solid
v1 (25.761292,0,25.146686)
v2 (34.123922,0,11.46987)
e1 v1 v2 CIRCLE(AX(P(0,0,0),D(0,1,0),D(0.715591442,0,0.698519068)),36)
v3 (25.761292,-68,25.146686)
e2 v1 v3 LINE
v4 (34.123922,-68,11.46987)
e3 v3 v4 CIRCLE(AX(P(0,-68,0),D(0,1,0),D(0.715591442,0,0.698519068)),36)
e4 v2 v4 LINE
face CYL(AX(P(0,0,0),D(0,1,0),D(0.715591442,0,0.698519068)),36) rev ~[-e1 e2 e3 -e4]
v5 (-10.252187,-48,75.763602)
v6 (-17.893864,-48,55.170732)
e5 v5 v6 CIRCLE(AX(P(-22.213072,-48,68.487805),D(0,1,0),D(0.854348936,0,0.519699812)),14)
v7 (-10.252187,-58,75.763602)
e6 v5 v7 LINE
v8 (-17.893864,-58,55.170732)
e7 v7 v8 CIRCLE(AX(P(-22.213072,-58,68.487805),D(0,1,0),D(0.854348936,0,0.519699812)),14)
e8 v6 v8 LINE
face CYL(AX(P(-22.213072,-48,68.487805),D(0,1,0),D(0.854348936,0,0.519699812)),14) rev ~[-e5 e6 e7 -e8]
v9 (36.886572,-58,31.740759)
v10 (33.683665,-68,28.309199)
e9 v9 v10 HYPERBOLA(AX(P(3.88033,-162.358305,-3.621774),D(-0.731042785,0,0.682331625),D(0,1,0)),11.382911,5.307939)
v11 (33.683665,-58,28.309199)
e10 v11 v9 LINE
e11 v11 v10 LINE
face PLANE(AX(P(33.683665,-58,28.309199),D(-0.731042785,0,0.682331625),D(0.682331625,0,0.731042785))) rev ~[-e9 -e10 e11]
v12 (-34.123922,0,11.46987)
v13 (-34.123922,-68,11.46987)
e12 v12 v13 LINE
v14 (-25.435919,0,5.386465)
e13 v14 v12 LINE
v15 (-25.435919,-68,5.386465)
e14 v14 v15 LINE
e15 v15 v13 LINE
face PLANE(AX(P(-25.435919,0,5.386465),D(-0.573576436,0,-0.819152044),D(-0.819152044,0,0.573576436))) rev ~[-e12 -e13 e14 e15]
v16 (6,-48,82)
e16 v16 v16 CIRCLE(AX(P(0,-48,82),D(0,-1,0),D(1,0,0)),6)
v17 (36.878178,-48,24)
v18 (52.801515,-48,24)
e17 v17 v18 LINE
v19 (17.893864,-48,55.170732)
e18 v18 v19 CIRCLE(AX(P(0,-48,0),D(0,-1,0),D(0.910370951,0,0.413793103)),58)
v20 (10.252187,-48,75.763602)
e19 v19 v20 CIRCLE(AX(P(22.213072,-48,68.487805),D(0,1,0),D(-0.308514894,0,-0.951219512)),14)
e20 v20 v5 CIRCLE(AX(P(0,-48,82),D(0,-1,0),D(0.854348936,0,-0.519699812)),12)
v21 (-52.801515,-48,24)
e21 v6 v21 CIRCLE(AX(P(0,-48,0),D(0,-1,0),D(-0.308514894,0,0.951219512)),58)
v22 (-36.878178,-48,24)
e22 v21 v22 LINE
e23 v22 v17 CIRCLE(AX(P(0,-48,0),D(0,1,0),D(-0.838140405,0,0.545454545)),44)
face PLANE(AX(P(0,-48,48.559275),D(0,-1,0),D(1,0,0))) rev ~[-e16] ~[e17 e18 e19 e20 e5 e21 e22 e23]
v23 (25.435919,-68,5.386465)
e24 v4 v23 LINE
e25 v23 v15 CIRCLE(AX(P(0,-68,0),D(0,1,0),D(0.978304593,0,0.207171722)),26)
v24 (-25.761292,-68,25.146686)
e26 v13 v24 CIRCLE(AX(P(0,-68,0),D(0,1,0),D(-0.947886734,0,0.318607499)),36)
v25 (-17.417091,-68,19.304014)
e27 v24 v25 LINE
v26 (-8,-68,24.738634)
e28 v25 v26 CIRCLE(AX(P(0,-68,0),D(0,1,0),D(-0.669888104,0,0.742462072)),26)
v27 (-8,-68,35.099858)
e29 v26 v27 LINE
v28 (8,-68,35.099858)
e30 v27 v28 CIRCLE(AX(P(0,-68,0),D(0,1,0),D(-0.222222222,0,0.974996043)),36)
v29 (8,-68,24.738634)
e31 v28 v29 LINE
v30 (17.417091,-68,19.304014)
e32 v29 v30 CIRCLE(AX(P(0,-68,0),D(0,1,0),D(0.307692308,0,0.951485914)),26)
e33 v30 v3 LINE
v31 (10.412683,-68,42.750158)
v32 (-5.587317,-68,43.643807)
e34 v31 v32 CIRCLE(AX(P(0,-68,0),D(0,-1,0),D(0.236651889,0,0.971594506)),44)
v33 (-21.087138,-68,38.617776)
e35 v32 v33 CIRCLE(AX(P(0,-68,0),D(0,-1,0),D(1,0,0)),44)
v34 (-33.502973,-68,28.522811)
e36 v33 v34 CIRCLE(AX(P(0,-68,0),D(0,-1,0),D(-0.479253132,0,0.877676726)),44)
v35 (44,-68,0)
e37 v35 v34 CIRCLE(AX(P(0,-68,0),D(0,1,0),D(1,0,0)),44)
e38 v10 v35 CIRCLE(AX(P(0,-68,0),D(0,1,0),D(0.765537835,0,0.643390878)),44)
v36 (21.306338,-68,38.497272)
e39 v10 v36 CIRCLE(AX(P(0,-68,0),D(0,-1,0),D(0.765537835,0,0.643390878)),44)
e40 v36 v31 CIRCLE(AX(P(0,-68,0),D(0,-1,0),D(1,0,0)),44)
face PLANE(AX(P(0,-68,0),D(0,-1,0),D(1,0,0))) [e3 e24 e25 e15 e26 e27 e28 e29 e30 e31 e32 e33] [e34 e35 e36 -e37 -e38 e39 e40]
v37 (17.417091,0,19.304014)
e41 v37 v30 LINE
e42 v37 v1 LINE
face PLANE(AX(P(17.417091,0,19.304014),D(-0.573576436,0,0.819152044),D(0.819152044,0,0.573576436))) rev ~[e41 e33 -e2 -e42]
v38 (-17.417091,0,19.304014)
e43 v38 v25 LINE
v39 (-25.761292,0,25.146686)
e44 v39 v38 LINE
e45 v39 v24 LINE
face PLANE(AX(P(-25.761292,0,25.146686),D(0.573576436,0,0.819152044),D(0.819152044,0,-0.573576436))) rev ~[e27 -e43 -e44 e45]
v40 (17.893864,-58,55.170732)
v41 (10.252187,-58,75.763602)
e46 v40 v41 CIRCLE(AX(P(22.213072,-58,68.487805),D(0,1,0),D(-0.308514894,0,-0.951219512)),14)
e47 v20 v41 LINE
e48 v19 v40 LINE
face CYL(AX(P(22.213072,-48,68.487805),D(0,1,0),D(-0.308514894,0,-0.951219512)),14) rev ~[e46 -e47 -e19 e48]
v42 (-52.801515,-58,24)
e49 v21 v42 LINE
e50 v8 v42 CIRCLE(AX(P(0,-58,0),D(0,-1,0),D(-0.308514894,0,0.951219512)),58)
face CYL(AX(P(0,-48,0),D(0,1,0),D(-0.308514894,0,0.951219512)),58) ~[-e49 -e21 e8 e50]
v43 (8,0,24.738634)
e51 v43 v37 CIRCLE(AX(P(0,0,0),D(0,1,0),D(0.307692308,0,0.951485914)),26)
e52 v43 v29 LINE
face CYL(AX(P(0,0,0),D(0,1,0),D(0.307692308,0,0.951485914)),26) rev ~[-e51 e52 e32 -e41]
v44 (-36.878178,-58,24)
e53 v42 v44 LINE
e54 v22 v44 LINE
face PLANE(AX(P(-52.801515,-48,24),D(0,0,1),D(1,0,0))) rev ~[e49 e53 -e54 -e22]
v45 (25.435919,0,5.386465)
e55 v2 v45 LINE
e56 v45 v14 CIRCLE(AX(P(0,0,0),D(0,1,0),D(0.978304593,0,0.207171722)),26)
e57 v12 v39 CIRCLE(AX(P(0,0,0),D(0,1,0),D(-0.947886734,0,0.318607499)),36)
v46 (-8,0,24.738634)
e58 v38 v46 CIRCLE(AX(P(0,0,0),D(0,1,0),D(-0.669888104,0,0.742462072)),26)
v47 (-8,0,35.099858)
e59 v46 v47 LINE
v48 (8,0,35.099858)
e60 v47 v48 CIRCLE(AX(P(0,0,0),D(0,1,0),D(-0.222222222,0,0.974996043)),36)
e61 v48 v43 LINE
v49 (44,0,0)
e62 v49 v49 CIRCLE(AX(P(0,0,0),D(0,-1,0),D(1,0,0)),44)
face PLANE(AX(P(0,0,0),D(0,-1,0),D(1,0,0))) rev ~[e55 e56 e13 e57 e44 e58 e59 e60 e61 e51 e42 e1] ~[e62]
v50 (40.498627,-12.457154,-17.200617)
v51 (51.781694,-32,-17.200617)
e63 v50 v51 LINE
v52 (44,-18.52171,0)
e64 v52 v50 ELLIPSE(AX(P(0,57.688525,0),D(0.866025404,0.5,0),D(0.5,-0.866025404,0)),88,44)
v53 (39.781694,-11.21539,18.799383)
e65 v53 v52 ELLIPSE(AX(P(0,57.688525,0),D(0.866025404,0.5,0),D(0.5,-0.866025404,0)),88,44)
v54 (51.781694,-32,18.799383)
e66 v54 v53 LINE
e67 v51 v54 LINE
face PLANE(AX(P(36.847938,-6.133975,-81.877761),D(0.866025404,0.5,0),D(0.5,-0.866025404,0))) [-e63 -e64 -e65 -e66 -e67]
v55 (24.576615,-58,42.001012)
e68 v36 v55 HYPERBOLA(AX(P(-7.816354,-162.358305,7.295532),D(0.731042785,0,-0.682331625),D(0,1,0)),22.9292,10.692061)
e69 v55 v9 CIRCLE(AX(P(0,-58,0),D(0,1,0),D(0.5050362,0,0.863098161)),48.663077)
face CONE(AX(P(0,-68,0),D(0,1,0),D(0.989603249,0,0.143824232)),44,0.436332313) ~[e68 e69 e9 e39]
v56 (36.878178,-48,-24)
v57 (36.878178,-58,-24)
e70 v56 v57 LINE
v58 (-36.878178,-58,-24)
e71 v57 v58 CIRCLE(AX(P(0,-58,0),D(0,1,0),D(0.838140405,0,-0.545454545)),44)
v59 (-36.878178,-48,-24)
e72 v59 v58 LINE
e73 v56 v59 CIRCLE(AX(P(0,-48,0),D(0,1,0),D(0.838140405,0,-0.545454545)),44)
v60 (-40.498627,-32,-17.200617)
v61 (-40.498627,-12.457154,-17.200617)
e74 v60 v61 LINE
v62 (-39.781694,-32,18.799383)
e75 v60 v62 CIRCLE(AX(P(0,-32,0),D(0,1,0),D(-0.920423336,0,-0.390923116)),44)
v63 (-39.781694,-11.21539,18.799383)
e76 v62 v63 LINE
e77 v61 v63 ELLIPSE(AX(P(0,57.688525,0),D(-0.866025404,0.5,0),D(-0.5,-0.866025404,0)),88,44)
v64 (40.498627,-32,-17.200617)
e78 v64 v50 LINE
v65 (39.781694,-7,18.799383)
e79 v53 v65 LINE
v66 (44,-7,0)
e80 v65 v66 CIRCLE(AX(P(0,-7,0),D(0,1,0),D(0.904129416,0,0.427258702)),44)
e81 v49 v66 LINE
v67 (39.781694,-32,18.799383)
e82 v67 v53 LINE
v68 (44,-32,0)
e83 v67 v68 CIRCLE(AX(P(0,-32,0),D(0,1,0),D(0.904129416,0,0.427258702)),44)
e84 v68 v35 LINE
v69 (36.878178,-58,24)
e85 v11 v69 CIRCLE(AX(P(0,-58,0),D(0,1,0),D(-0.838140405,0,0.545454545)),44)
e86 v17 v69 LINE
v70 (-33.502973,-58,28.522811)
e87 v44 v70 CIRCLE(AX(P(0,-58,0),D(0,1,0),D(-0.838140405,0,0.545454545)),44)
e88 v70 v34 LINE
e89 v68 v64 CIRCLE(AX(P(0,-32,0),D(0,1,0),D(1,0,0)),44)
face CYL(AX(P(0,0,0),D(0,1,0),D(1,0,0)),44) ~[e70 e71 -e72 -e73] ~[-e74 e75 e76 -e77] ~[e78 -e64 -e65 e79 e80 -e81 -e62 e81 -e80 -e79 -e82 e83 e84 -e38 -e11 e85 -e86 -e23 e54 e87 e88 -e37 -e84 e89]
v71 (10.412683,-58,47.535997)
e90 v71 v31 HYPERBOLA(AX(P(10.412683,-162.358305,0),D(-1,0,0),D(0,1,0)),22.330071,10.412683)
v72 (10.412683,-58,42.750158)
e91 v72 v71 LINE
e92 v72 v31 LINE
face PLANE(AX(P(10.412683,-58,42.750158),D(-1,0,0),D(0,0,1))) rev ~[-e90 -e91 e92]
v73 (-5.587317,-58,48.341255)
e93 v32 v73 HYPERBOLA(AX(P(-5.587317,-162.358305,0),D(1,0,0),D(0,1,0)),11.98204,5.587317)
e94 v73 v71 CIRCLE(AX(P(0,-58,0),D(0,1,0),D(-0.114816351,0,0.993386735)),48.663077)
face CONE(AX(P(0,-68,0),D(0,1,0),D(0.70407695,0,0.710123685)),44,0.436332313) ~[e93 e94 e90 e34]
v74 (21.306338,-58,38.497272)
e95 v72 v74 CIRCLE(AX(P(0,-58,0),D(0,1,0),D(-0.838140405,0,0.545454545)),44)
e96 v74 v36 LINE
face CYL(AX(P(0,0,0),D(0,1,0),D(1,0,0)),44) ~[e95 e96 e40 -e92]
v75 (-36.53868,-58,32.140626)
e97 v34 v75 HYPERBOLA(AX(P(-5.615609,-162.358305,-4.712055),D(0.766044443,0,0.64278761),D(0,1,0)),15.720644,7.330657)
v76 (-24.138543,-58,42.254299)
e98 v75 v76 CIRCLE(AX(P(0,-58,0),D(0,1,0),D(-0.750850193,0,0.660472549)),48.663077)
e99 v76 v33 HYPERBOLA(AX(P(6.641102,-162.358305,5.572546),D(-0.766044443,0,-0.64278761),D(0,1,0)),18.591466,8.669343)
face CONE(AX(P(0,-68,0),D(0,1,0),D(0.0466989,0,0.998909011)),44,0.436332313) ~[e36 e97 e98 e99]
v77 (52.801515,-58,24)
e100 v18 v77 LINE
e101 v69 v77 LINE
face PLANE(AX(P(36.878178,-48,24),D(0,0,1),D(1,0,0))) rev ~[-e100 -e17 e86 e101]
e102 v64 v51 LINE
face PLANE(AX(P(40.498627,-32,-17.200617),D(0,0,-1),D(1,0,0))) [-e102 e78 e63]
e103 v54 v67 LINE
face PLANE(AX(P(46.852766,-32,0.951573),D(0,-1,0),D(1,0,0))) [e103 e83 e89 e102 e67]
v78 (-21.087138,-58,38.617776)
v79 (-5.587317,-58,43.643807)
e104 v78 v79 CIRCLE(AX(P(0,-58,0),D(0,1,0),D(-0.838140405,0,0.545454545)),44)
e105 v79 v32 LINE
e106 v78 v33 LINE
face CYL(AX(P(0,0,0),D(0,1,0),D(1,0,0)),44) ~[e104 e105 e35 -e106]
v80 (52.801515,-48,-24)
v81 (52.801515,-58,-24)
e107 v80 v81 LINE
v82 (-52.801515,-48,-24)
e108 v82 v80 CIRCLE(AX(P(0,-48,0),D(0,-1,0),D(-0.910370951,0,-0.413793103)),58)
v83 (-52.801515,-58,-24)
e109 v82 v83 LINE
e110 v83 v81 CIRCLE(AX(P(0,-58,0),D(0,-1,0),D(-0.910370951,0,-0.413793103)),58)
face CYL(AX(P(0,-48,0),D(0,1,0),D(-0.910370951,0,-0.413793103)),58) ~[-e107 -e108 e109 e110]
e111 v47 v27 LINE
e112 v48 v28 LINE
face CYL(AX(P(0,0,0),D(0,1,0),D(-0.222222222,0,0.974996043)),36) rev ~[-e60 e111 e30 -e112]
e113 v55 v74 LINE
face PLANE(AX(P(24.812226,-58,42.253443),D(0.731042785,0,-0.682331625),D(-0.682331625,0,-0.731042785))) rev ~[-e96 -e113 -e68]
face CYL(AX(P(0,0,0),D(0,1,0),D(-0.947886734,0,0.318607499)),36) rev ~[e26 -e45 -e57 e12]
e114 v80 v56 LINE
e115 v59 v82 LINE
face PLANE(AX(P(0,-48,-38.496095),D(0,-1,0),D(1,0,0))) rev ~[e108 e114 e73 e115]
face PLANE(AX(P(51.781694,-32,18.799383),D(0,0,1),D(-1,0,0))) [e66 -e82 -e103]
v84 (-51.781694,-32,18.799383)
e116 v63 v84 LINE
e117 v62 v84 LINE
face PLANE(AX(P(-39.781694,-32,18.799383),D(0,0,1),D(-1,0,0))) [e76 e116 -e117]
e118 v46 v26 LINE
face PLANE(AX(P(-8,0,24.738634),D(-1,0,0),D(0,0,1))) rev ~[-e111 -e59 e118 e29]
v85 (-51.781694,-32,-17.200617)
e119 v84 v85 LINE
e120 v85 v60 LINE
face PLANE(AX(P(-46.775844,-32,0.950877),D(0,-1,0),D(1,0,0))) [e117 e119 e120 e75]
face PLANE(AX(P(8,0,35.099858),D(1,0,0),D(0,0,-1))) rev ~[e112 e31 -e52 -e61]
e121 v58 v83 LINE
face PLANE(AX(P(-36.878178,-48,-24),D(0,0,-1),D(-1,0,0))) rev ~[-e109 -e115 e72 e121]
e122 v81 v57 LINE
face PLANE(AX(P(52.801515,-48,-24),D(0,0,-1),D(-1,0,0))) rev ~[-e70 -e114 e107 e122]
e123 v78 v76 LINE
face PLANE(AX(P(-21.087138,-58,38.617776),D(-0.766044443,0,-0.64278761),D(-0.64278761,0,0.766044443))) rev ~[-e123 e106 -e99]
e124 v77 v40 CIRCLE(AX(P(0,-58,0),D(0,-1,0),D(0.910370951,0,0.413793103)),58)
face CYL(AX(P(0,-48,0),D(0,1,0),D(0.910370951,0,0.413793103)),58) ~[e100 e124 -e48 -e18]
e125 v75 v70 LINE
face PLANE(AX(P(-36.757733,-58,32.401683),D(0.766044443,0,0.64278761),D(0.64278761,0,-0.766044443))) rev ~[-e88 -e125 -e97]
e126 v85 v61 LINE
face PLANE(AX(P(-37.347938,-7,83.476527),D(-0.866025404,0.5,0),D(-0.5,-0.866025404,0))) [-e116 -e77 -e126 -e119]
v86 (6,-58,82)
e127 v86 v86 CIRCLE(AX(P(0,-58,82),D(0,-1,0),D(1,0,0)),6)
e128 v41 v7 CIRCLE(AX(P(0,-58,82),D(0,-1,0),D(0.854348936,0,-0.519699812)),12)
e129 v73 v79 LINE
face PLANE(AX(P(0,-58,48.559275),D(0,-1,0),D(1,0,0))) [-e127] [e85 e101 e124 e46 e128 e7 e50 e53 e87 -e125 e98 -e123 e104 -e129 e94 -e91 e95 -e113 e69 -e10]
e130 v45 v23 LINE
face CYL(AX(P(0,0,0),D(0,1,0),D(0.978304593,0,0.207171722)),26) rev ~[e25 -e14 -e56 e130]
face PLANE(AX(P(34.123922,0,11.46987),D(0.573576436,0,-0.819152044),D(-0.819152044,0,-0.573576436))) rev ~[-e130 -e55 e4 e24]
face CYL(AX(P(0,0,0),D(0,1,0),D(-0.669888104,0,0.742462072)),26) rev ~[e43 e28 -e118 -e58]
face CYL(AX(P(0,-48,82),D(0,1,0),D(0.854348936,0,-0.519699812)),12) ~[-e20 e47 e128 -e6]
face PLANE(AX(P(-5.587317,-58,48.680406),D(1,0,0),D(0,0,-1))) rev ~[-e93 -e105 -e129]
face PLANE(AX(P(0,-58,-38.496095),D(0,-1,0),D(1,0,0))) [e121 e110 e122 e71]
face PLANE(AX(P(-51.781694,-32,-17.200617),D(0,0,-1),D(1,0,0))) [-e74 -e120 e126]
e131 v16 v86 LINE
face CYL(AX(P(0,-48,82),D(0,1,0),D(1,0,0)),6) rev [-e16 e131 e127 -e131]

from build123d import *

# Parameters (mm, degrees)
F0_R         = 44
F1_DEPTH     = 68
F3_R         = 6
F4_DEPTH     = 10
F7_DEPTH     = 10
F8_T4_ANGLE  = 83.7942350081
F8_T9_ANGLE  = 83.7884226617
F8_T14_ANGLE = 83.7665747307
F11_DEPTH    = 25
F12_T4_DEPTH = 165.3542877323
F12_S5_R     = 44
F12_T6_DEPTH = 86
F13_T4_DEPTH = 165.3542877323
F13_S5_R     = 44
F13_T6_DEPTH = 85


# Not quite as in the source:
# - a fillet or chamfer that OpenCascade refuses, or shapes differently, is made with other operations: its cross-section is extruded or revolved along the edge and cut away or added


with BuildPart() as f1:
    # F0 (on Front) → F1 (new body)
    with BuildSketch(Plane.XZ):
        Circle(F0_R)
        with BuildLine():
            ThreePointArc((-17.4170906965, 19.3040138746), (-12.9958030986, 22.5190830591), (-8, 24.7386337537))
            Line((-8, 24.7386337537), (-8, 35.0998575496))
            ThreePointArc((-8, 35.0998575496), (0, 36), (8, 35.0998575496))
            Line((8, 35.0998575496), (8, 24.7386337537))
            ThreePointArc((8, 24.7386337537), (12.9958030986, 22.5190830591), (17.4170906965, 19.3040138746))
            Line((17.4170906965, 19.3040138746), (25.7612918983, 25.1466864563))
            ThreePointArc((25.7612918983, 25.1466864563), (30.7135727536, 18.7796818053), (34.1239224392, 11.4698699802))
            Line((34.1239224392, 11.4698699802), (25.4359194285, 5.3864647801))
            ThreePointArc((25.4359194285, 5.3864647801), (0, -26), (-25.4359194285, 5.3864647801))
            Line((-25.4359194285, 5.3864647801), (-34.1239224392, 11.4698699802))
            ThreePointArc((-34.1239224392, 11.4698699802), (-30.7135727536, 18.7796818053), (-25.7612918983, 25.1466864563))
            Line((-25.7612918983, 25.1466864563), (-17.4170906965, 19.3040138746))
        make_face(mode=Mode.SUBTRACT)
    extrude(amount=F1_DEPTH)

    # F3 (on offset) → F4 (join)
    with BuildSketch(Plane.XZ.offset(48)):
        with BuildLine():
            ThreePointArc((-10.252187236, 75.7636022514), (-9.0876412514, 63.6171726174), (-17.8938638331, 55.1707317073))
            ThreePointArc((-17.8938638331, 55.1707317073), (-38.6311115614, 43.2624227191), (-52.8015151298, 24))
            Line((-52.8015151298, 24), (-36.8781778292, 24))
            ThreePointArc((-36.8781778292, 24), (0, 44), (36.8781778292, 24))
            Line((36.8781778292, 24), (52.8015151298, 24))
            ThreePointArc((52.8015151298, 24), (38.6311115614, 43.2624227191), (17.8938638331, 55.1707317073))
            ThreePointArc((17.8938638331, 55.1707317073), (9.0876412514, 63.6171726174), (10.252187236, 75.7636022514))
            ThreePointArc((10.252187236, 75.7636022514), (0, 94), (-10.252187236, 75.7636022514))
        make_face()
        with Locations((0, 82)):
            Circle(F3_R, mode=Mode.SUBTRACT)
        with BuildLine():
            ThreePointArc((36.8781778292, -24), (0, -44), (-36.8781778292, -24))
            Line((-36.8781778292, -24), (-52.8015151298, -24))
            ThreePointArc((-52.8015151298, -24), (0, -58), (52.8015151298, -24))
            Line((52.8015151298, -24), (36.8781778292, -24))
        make_face()
    extrude(amount=F4_DEPTH)

    # F6 (on offset) → F7 (join)
    with BuildSketch(Plane.XZ.offset(58)):
        with BuildLine():
            Line((-36.7577330787, 32.4016829643), (-33.5029734135, 28.5228114402))
            ThreePointArc((-33.5029734135, 28.5228114402), (-27.7578301996, 34.1394619555), (-21.0871377876, 38.6177759578))
            Line((-21.0871377876, 38.6177759578), (-24.3586089556, 42.5165634753))
            ThreePointArc((-24.3586089556, 42.5165634753), (-30.9738521636, 37.9686776455), (-36.7577330787, 32.4016829643))
        make_face()
        with BuildLine():
            ThreePointArc((-5.5873169023, 43.6438070043), (2.4537097938, 43.9315297736), (10.4126830977, 42.7501582536))
            Line((10.4126830977, 42.7501582536), (10.4126830977, 47.8808524434))
            ThreePointArc((10.4126830977, 47.8808524434), (2.4455798994, 48.9389327525), (-5.5873169023, 48.6804056046))
            Line((-5.5873169023, 48.6804056046), (-5.5873169023, 43.6438070043))
        make_face()
        with BuildLine():
            Line((33.6836647587, 28.3091986539), (37.1178360984, 31.9885329982))
            ThreePointArc((37.1178360984, 31.9885329982), (31.3875014297, 37.6274468175), (24.8122261451, 42.2534428624))
            Line((24.8122261451, 42.2534428624), (21.306338137, 38.4972720487))
            ThreePointArc((21.306338137, 38.4972720487), (27.9629096213, 33.9716894709), (33.6836647587, 28.3091986539))
        make_face()
    extrude(amount=F7_DEPTH)

    # F8: chamfer of 5 x 10.7225346025 on 3 edges, made by hand


with BuildPart() as f8_tool2:
    # F8_s3 → F8_t4 (revolve)
    with BuildSketch(Plane(origin=(0, 0, 0), x_dir=(0, 1, 0), z_dir=(0.1438242317, 0, -0.989603249))):
        Polygon((-68, 44), (-57.2774653975, 49), (-68, 49), align=None)
    revolve(axis=Axis((0, -68, 0), (0, -1, 0)), revolution_arc=F8_T4_ANGLE)

    split(bisect_by=Plane.XZ.offset(58), keep=Keep.TOP)


with BuildPart() as f1_1:
    add(f1.part)

    # F8_t1: cut F8_tool2
    add(f8_tool2.part, mode=Mode.SUBTRACT)


with BuildPart() as f8_tool7:
    # F8_s8 → F8_t9 (revolve)
    with BuildSketch(Plane(origin=(0, 0, 0), x_dir=(0, 1, 0), z_dir=(0.7101236851, 0, -0.7040769502))):
        Polygon((-68, 44), (-57.2774653975, 49), (-68, 49), align=None)
    revolve(axis=Axis((0, -68, 0), (0, -1, 0)), revolution_arc=F8_T9_ANGLE)

    split(bisect_by=Plane.XZ.offset(58), keep=Keep.TOP)


with BuildPart() as f1_2:
    add(f1_1.part)

    # F8_t6: cut F8_tool7
    add(f8_tool7.part, mode=Mode.SUBTRACT)


with BuildPart() as f8_tool12:
    # F8_s13 → F8_t14 (revolve)
    with BuildSketch(Plane(origin=(0, 0, 0), x_dir=(0, 1, 0), z_dir=(0.9989090113, 0, -0.0466988996))):
        Polygon((-68, 44), (-57.2774653975, 49), (-68, 49), align=None)
    revolve(axis=Axis((0, -68, 0), (0, -1, 0)), revolution_arc=F8_T14_ANGLE)

    split(bisect_by=Plane.XZ.offset(58), keep=Keep.TOP)


with BuildPart() as f1_3:
    add(f1_2.part)

    # F8_t11: cut F8_tool12
    add(f8_tool12.part, mode=Mode.SUBTRACT)

    # F10 (on offset) → F11 (join)
    with BuildSketch(Plane.XZ.offset(32)):
        with BuildLine():
            ThreePointArc((39.7816943244, 18.7993828803), (42.9324734337, 9.6334170917), (44, 0))
            ThreePointArc((44, 0), (43.1157719293, -8.7766856466), (40.4986267755, -17.2006171197))
            Line((40.4986267755, -17.2006171197), (51.7816943244, -17.2006171197))
            Line((51.7816943244, -17.2006171197), (51.7816943244, 18.7993828803))
            Line((51.7816943244, 18.7993828803), (39.7816943244, 18.7993828803))
        make_face()
        with BuildLine():
            ThreePointArc((-40.4986267755, -17.2006171197), (-43.9912774192, 0.8760770652), (-39.7816943244, 18.7993828803))
            Line((-39.7816943244, 18.7993828803), (-51.7816943244, 18.7993828803))
            Line((-51.7816943244, 18.7993828803), (-51.7816943244, -17.2006171197))
            Line((-51.7816943244, -17.2006171197), (-40.4986267755, -17.2006171197))
        make_face()
    extrude(amount=-F11_DEPTH)

    # F12: chamfer of 25 x 14.4337567297 on 1 edges, made by hand


with BuildPart() as f12_tool2:
    # F12_s3 → F12_t4 (new body)
    with BuildSketch(Plane.XY.offset(-81.8777609858)):
        with BuildLine():
            Line((36.8479375946, -6.1339745962), (52.2816943244, -32.8660254038))
            Line((52.2816943244, -32.8660254038), (52.7816943244, -32.8660254038))
            ThreePointArc((52.7816943244, -32.8660254038), (52.2816943244, -19.9330127019), (52.2816943244, -7))
            Line((52.2816943244, -7), (51.7816943244, -6.5))
            ThreePointArc((51.7816943244, -6.5), (44.3148159595, -6.5), (36.8479375946, -5.6339745962))
            Line((36.8479375946, -5.6339745962), (36.8479375946, -6.1339745962))
        make_face()
    extrude(amount=F12_T4_DEPTH)

    # F12_s5 → F12_t6 (cut, symmetric)
    with BuildSketch(Plane.XZ.offset(19.3)):
        Circle(F12_S5_R)
    extrude(amount=F12_T6_DEPTH, both=True, mode=Mode.SUBTRACT)


with BuildPart() as f1_4:
    add(f1_3.part)

    # F12_t1: cut F12_tool2
    add(f12_tool2.part, mode=Mode.SUBTRACT)

    # F13: chamfer of 25 x 14.4337567297 on 1 edges, made by hand


with BuildPart() as f13_tool2:
    # F13_s3 → F13_t4 (new body)
    with BuildSketch(Plane.XY.offset(83.4765267465)):
        Polygon((-37.3479375946, -7), (-51.7816943244, -32), (-51.7816943244, -7), align=None)
    extrude(amount=-F13_T4_DEPTH)

    # F13_s5 → F13_t6 (cut, symmetric)
    with BuildSketch(Plane.XZ.offset(19.5)):
        Circle(F13_S5_R)
    extrude(amount=F13_T6_DEPTH, both=True, mode=Mode.SUBTRACT)


with BuildPart() as f1_5:
    add(f1_4.part)

    # F13_t1: cut F13_tool2
    add(f13_tool2.part, mode=Mode.SUBTRACT)


solid = f1_5.part
